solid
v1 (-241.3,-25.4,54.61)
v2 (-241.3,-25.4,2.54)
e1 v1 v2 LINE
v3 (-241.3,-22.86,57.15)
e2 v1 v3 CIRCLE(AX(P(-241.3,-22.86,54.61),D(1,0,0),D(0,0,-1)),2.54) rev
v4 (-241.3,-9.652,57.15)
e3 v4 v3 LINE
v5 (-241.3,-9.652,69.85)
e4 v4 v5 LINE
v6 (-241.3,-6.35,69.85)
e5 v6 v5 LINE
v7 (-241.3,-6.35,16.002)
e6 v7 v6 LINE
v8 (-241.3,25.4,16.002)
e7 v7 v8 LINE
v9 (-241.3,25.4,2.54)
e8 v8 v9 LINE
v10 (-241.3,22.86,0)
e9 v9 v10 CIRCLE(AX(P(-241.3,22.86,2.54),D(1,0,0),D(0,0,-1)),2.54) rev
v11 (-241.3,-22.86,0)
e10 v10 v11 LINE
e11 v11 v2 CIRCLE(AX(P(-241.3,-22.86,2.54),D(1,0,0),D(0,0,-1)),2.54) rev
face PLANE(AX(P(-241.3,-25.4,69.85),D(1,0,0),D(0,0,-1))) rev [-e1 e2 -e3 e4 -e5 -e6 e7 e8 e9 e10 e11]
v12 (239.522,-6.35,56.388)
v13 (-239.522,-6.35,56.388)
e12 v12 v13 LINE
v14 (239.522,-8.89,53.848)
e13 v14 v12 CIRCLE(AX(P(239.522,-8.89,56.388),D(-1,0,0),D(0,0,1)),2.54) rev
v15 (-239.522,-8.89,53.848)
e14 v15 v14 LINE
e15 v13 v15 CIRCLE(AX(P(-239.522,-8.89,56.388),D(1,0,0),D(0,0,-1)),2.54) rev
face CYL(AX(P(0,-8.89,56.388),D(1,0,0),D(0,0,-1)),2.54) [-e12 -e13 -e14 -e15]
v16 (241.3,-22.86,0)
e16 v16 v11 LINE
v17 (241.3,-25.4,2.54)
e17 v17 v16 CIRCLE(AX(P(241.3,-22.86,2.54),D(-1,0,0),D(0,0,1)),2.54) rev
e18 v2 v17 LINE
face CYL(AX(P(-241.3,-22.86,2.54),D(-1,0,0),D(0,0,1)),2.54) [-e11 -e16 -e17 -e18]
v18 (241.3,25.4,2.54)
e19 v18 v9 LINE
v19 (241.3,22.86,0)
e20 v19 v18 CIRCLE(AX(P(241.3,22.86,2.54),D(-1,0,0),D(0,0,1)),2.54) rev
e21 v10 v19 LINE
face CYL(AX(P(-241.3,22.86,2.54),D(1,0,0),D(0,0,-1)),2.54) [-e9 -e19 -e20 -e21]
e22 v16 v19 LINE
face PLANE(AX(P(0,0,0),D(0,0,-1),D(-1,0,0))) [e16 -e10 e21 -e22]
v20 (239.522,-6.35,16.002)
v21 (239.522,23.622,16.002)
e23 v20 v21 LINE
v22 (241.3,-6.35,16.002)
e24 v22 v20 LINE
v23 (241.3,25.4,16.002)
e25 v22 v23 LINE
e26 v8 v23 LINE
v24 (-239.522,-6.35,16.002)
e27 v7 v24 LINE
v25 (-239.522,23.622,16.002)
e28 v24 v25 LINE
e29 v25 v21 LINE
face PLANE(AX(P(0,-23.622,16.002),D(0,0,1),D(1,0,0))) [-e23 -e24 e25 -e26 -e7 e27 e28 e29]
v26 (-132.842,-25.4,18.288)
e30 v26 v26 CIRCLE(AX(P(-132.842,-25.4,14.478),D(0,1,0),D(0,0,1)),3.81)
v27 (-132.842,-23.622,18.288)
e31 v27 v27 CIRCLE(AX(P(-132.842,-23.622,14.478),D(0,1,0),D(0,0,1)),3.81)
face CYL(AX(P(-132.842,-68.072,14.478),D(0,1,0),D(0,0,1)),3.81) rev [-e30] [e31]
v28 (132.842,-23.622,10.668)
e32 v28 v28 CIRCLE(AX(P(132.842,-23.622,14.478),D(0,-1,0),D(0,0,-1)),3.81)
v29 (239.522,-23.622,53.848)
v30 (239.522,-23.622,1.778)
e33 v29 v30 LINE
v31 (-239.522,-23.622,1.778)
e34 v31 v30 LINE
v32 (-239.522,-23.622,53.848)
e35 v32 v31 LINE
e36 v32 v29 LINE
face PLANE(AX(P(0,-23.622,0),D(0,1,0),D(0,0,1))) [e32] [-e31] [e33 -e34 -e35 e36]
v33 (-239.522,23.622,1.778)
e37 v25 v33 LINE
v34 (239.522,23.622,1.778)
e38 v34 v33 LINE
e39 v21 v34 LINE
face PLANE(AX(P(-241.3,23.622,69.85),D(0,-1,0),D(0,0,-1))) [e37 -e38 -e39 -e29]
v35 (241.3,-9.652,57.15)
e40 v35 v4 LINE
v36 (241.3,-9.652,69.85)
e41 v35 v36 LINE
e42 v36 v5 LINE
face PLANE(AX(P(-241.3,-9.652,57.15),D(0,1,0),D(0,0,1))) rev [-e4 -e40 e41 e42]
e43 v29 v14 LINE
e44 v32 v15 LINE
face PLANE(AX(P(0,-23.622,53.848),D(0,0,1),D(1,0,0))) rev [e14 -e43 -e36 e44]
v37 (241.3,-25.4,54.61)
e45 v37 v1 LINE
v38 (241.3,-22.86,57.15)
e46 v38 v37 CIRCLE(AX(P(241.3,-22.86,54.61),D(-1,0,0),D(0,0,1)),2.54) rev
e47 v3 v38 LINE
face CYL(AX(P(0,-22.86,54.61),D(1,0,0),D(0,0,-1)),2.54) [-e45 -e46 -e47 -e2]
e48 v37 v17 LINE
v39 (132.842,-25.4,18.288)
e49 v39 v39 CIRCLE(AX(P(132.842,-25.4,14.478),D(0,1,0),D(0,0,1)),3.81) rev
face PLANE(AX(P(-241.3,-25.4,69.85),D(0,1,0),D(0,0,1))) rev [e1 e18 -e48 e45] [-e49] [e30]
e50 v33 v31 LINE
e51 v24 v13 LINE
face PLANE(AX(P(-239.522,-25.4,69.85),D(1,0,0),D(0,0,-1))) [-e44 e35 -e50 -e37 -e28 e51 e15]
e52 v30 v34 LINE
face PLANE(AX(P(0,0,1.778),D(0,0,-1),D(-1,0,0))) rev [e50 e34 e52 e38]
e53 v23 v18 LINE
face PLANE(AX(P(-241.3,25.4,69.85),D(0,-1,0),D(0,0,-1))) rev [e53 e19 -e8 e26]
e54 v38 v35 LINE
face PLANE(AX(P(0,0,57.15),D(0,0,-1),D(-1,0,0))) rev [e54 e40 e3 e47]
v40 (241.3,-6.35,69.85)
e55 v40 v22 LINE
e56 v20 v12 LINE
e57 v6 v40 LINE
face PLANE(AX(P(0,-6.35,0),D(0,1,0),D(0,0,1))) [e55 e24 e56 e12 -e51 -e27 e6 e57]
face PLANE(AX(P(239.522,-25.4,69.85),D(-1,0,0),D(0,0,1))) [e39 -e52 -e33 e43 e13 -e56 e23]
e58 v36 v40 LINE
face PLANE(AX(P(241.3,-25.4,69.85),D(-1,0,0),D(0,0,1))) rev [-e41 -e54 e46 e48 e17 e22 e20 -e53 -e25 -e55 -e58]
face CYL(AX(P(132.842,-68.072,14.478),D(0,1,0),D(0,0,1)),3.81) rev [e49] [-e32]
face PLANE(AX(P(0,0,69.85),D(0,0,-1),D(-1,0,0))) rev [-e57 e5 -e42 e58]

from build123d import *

# Parameters (mm, degrees)
SKETCH1_W           = 482.6
SKETCH1_H           = 50.8
BOSS_EXTRUDE1_DEPTH = 69.85
CUT_EXTRUDE2_DEPTH  = 49.022
SKETCH3_W           = 482.6
SKETCH3_H           = 16.002
CUT_EXTRUDE3_DEPTH  = 31.75
SKETCH4_W           = 482.6
SKETCH4_H           = 15.748
CUT_EXTRUDE4_DEPTH  = 12.7
SHELL2_START        = -23.622
SHELL2_OUTLINE_W    = 479.044
SHELL2_OUTLINE_H    = 14.224
SHELL2_DEPTH        = 47.244
SKETCH5_W           = 1.778
SKETCH5_H           = 17.272
BOSS_EXTRUDE2_DEPTH = 44.45
FILLET1_R           = 2.54
SKETCH6_R           = 3.81
CUT_EXTRUDE5_DEPTH  = 44.45


# Read off the part's stored shape, not the designer's step: Shell2
with BuildPart() as part:
    # Sketch1 → Boss-Extrude1 (new body)
    with BuildSketch(Plane.XY):
        Rectangle(SKETCH1_W, SKETCH1_H)
    extrude(amount=BOSS_EXTRUDE1_DEPTH)

    # Sketch2 → Cut-Extrude2 (cut)
    with BuildSketch(Plane(origin=(0, 25.4, 0), x_dir=(1, 0, 0), z_dir=(0, 1, 0))):
        Polygon((241.3, -16.002), (-241.3, -16.002), (-241.3, -34.925), (-241.3, -53.848), (241.3, -53.848), align=None)
    extrude(amount=-CUT_EXTRUDE2_DEPTH, mode=Mode.SUBTRACT)

    # Sketch3 → Cut-Extrude3 (cut)
    with BuildSketch(Plane(origin=(0, 25.4, 0), x_dir=(1, 0, 0), z_dir=(0, 1, 0))):
        with Locations((0, -61.849)):
            Rectangle(SKETCH3_W, SKETCH3_H)
    extrude(amount=-CUT_EXTRUDE3_DEPTH, mode=Mode.SUBTRACT)

    # Sketch4 → Cut-Extrude4 (cut)
    with BuildSketch(Plane.XY.offset(69.85)):
        with Locations((0, -17.526)):
            Rectangle(SKETCH4_W, SKETCH4_H)
    extrude(amount=-CUT_EXTRUDE4_DEPTH, mode=Mode.SUBTRACT)

    # Shell2 outline → Shell2 (cut)
    with BuildSketch(Plane(origin=(0, 0, 0), x_dir=(1, 0, 0), z_dir=(0, 1, 0)).offset(SHELL2_START)):
        with Locations((0, -8.89)):
            Rectangle(SHELL2_OUTLINE_W, SHELL2_OUTLINE_H)
    extrude(amount=SHELL2_DEPTH, mode=Mode.SUBTRACT)

    # Sketch5 → Boss-Extrude2 (add)
    with BuildSketch(Plane(origin=(0, 0, 53.848), x_dir=(-1, 0, 0), z_dir=(0, 0, -1))):
        with Locations((240.411, -14.986)):
            Rectangle(SKETCH5_W, SKETCH5_H)
        with Locations((-240.411, -14.986)):
            Rectangle(SKETCH5_W, SKETCH5_H)
    extrude(amount=BOSS_EXTRUDE2_DEPTH)

    # Fillet1
    fillet1_edges = [part.edges().sort_by_distance(p)[0] for p in [
        (0, -25.4, 0),
        (0, -25.4, 57.15),
        (0, 25.4, 0),
        (0, -6.35, 53.848),
    ]]
    fillet(fillet1_edges, radius=FILLET1_R)

    # Sketch6 → Cut-Extrude5 (cut)
    with BuildSketch(Plane(origin=(0, -23.622, 0), x_dir=(1, 0, 0), z_dir=(0, 1, 0))):
        with Locations(Location((-132.842, -14.478, 0), (0, 0, 270))):
            Circle(SKETCH6_R)
        with Locations(Location((132.842, -14.478, 0), (0, 0, 270))):
            Circle(SKETCH6_R)
    extrude(amount=-CUT_EXTRUDE5_DEPTH, mode=Mode.SUBTRACT)


solid = part.part
